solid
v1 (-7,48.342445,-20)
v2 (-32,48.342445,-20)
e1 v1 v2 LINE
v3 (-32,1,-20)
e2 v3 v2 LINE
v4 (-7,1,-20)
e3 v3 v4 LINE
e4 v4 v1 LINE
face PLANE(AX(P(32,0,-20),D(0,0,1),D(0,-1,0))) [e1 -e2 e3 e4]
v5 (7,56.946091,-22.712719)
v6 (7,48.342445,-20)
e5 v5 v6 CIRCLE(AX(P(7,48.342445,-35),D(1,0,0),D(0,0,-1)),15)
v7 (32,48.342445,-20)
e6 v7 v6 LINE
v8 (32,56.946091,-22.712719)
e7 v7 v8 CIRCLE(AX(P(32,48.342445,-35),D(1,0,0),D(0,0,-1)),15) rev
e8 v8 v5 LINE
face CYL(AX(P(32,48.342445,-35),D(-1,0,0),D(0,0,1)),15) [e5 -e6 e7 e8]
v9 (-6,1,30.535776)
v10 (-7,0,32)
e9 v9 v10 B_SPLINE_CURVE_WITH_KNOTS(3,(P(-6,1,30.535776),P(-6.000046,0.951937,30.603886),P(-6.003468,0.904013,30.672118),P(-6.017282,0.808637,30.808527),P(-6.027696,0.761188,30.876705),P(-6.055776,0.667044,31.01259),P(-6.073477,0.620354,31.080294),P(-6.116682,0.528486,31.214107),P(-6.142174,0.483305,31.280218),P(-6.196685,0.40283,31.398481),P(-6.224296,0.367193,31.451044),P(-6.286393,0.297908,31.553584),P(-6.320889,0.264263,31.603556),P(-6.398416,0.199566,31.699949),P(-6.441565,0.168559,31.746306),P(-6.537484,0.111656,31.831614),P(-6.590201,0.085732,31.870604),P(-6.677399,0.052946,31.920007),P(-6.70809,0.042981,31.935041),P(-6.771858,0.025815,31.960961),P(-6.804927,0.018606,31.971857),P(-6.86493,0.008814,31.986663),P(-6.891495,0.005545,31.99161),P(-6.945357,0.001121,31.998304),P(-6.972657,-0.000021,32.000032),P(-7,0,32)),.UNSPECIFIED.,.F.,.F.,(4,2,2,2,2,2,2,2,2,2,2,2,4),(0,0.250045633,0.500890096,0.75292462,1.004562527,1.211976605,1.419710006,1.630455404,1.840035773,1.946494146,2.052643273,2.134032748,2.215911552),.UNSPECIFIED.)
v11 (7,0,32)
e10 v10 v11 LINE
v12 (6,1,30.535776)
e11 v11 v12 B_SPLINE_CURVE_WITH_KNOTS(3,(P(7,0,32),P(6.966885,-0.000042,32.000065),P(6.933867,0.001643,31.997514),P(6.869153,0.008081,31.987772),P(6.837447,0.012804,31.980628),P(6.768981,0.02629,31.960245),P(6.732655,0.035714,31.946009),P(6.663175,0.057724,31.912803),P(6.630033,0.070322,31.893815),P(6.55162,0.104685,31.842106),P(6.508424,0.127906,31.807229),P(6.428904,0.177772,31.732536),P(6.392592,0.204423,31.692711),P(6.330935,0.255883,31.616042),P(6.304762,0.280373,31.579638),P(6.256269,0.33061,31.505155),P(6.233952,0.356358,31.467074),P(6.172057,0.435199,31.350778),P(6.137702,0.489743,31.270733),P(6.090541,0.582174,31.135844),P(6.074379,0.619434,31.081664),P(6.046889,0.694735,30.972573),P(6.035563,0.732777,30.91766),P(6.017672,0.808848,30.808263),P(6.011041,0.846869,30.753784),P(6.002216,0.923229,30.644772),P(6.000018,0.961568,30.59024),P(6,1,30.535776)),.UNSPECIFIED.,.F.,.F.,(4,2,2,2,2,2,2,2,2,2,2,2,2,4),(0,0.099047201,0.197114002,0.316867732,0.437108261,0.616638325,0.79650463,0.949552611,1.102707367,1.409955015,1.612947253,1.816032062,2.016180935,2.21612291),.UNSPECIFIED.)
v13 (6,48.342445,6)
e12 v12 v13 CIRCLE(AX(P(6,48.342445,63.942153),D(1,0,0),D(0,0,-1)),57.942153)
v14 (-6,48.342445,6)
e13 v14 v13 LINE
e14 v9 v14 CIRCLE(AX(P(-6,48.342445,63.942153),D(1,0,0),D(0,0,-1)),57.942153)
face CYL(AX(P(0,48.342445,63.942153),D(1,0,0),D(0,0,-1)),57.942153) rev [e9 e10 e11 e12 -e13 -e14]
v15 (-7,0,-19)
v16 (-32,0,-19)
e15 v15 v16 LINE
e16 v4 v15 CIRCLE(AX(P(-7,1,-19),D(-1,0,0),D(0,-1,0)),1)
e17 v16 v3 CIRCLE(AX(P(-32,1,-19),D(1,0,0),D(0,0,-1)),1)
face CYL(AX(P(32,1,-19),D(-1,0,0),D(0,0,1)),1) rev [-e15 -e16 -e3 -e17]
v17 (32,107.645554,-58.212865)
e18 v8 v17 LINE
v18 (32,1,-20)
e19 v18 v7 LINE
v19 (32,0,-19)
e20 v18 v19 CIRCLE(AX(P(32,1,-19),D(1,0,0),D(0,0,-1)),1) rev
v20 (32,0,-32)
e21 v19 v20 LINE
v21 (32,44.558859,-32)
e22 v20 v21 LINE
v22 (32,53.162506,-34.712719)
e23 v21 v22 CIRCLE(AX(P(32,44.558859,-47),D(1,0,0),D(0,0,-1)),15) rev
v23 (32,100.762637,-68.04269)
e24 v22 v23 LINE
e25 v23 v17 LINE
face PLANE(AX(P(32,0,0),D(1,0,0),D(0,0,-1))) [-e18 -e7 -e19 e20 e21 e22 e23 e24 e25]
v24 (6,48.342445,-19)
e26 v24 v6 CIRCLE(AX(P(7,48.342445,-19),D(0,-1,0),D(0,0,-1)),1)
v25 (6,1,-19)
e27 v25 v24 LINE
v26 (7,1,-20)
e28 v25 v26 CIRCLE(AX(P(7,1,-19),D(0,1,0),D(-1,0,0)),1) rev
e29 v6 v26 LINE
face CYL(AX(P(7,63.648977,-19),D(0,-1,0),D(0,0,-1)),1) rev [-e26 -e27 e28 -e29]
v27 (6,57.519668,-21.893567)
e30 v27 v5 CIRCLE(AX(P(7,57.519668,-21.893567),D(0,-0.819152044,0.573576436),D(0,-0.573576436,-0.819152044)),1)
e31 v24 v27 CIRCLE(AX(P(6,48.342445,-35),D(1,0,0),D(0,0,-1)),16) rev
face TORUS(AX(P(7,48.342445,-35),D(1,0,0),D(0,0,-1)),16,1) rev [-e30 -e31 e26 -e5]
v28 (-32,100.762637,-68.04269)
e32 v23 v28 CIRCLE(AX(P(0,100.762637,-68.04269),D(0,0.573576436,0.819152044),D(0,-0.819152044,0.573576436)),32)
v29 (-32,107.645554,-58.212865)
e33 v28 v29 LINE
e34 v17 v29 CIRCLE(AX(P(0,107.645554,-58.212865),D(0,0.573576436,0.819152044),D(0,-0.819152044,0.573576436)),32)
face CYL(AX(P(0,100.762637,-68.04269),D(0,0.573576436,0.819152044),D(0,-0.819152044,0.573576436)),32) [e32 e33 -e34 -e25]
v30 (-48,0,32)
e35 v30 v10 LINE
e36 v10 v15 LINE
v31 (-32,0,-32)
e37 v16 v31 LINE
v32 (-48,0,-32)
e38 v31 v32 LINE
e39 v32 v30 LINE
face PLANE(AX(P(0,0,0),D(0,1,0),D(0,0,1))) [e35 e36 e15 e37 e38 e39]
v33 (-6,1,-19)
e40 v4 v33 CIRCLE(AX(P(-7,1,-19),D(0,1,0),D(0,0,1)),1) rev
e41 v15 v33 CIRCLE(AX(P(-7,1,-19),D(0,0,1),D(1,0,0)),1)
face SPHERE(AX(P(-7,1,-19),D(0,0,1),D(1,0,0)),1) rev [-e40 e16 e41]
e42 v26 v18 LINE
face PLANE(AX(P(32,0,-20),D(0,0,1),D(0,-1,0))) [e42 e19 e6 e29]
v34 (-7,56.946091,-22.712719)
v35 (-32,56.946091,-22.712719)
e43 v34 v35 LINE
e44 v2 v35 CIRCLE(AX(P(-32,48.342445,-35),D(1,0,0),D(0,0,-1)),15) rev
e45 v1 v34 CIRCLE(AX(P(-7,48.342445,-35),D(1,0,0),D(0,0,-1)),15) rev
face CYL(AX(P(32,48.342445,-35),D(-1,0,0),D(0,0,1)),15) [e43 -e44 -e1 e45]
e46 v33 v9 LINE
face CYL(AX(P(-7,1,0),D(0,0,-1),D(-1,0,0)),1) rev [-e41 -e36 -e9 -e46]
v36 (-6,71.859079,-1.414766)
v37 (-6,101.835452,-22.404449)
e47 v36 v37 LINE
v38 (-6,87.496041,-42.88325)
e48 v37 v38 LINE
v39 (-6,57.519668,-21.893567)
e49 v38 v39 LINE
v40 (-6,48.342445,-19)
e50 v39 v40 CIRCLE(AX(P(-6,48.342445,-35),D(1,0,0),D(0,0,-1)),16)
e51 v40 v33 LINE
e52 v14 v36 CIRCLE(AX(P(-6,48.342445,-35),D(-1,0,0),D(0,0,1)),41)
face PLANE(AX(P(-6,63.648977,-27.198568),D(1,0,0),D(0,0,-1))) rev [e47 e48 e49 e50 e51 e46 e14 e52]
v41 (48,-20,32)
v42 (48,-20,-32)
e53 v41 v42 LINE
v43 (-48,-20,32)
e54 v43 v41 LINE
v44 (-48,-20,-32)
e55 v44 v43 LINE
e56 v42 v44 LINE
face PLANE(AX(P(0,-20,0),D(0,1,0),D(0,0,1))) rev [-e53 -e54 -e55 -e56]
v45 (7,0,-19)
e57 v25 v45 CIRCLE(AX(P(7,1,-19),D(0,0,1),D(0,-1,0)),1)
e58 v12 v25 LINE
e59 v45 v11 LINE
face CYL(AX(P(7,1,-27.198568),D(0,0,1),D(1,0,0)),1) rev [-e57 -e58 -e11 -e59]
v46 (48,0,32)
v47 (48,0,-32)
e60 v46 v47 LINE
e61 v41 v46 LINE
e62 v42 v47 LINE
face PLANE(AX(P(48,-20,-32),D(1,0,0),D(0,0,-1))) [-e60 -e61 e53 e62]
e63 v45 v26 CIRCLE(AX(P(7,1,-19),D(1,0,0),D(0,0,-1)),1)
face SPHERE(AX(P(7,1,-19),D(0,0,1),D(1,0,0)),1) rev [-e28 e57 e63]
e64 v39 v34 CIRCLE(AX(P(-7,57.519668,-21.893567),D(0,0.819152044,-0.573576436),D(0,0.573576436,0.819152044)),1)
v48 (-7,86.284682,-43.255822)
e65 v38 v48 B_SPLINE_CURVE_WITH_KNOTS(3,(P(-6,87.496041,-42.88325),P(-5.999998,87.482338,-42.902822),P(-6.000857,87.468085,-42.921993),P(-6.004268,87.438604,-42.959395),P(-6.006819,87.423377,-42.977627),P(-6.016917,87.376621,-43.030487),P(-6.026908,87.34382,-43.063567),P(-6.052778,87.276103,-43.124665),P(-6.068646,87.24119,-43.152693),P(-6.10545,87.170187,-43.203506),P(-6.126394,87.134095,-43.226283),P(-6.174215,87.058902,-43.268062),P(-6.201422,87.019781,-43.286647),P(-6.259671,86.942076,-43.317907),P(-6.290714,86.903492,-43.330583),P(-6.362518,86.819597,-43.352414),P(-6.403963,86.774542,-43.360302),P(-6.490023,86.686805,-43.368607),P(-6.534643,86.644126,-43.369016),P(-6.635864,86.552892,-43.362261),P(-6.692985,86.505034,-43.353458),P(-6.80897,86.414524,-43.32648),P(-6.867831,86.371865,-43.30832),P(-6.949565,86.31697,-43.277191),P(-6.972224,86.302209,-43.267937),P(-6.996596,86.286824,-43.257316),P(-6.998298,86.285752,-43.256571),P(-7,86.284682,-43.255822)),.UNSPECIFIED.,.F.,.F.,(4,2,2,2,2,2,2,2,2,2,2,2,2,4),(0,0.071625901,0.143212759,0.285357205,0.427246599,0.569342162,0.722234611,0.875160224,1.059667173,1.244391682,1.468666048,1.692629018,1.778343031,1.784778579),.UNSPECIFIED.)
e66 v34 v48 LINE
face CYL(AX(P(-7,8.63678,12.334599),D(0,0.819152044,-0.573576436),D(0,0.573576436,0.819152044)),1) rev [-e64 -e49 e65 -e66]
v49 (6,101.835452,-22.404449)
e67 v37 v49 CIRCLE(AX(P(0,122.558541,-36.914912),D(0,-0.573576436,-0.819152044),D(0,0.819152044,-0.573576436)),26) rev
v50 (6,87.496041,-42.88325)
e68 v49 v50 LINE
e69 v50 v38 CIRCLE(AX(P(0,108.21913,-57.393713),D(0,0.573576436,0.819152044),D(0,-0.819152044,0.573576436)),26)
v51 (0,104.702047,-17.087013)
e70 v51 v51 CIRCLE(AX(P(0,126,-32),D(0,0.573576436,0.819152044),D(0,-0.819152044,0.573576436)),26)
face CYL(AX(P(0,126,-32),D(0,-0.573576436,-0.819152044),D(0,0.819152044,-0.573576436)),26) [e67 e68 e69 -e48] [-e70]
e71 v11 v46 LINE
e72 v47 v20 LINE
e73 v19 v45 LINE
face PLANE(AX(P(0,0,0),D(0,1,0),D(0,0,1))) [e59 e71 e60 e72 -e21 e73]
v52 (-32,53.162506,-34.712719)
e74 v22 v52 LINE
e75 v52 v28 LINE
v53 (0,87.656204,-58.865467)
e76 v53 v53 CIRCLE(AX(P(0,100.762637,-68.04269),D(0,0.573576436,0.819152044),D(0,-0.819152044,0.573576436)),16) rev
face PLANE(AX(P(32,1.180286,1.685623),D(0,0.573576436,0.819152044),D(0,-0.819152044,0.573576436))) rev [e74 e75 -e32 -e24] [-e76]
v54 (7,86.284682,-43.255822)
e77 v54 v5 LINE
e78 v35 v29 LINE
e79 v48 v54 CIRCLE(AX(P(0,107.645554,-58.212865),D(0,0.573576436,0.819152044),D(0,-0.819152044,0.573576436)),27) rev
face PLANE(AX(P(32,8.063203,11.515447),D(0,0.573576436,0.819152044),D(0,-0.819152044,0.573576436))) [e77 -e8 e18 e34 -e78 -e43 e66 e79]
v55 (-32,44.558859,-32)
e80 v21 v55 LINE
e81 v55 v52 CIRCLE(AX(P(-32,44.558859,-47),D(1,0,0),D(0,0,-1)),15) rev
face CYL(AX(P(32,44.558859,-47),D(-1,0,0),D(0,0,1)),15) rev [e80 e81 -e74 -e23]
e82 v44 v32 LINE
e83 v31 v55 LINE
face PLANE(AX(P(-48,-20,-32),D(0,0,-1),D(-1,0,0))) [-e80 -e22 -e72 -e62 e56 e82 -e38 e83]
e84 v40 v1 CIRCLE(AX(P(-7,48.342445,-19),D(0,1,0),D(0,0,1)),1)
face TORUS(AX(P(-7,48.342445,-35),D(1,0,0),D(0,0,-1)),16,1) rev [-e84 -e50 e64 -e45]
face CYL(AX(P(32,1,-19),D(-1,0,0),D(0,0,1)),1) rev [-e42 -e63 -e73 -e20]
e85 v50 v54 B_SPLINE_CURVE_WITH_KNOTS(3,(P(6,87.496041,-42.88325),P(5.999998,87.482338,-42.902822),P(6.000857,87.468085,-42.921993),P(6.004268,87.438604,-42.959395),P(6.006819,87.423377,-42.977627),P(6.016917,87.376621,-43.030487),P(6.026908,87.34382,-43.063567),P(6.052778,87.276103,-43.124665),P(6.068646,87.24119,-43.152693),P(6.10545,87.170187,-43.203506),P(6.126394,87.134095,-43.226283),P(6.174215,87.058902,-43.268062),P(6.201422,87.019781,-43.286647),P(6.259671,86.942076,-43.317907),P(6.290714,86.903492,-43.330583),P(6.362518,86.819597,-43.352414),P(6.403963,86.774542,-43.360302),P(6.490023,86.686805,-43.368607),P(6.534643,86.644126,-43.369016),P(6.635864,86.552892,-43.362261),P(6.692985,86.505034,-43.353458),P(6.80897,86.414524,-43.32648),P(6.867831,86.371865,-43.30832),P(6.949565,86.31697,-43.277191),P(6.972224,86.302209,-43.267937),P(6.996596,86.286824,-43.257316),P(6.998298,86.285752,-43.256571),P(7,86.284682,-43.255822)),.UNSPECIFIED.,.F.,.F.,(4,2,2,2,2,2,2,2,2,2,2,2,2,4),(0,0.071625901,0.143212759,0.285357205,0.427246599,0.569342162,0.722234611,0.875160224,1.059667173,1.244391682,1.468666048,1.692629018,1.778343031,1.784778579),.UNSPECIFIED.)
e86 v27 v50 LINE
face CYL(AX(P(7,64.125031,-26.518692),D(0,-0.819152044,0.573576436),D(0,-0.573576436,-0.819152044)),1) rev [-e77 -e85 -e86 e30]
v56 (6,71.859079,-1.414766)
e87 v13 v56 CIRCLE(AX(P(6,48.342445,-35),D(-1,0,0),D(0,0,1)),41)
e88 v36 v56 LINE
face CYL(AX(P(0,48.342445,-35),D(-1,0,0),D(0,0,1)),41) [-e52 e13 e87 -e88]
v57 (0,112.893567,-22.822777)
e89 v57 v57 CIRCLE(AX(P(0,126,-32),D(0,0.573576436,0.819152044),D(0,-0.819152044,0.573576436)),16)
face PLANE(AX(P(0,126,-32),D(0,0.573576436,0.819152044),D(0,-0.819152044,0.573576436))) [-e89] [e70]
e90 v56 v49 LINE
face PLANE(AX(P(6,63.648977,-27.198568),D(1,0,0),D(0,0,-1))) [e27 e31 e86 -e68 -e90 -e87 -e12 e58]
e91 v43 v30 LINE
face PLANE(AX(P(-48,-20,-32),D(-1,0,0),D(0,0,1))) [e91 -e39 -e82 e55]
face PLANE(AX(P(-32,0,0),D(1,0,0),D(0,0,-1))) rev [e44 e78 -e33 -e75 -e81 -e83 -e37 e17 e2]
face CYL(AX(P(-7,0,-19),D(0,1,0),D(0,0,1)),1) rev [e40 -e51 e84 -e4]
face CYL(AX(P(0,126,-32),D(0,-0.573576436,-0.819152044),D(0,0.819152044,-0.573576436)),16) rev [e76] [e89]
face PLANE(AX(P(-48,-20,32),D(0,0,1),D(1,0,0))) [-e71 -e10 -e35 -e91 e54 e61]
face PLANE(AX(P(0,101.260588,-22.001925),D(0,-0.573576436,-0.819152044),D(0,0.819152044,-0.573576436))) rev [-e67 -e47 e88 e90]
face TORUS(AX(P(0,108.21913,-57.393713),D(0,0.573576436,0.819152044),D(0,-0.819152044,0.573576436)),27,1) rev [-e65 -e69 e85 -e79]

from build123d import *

# Parameters (mm, degrees)
SKETCH1_W               = 96
SKETCH1_H               = 64
BOSS_EXTRUDE1_DEPTH     = 20
BOSS_EXTRUDE2_DEPTH     = 32
BOSS_EXTRUDE3_DEPTH     = 12
SKETCH8_R               = 26
SKETCH8_R_2             = 16
BOSS_EXTRUDE4_DEPTH     = 32
CUT_EXTRUDE1_DEPTH      = 177.853582377
CUT_EXTRUDE1_DEPTH_BACK = 177.853582377
SKETCH9_R               = 16
RIB9_START              = -6
RIB9_DEPTH              = 12
FILLET1_R               = 1


with BuildPart() as part:
    # Sketch1 → Boss-Extrude1 (new body)
    with BuildSketch(Plane(origin=(0, 0, 0), x_dir=(1, 0, 0), z_dir=(0, 1, 0))):
        Rectangle(SKETCH1_W, SKETCH1_H)
    extrude(amount=-BOSS_EXTRUDE1_DEPTH)

    # Sketch4 → Boss-Extrude2 (add, symmetric)
    with BuildSketch(Plane(origin=(0, 0, 0), x_dir=(0, 0, -1), z_dir=(1, 0, 0))):
        with BuildLine():
            Line((20, -20), (32, -20))
            Line((32, -20), (32, 44.558859159))
            ThreePointArc((32, 44.558859159), (32.694245739, 49.069446152), (34.712719336, 53.162505705))
            Line((34.712719336, 53.162505705), (68.042689949, 100.762636801))
            Line((68.042689949, 100.762636801), (58.212865417, 107.645554037))
            Line((58.212865417, 107.645554037), (22.712719336, 56.946091171))
            ThreePointArc((22.712719336, 56.946091171), (20.694245739, 52.853031619), (20, 48.342444626))
            Line((20, 48.342444626), (20, -20))
        make_face()
    extrude(amount=BOSS_EXTRUDE2_DEPTH, both=True)

    # Sketch6 → Boss-Extrude3 (add)
    with BuildSketch(Plane(origin=(0, 8.063203075, 11.515447399), x_dir=(1, 0, 0), z_dir=(0, 0.573576436351053, 0.819152044288987))):
        with BuildLine():
            Line((-32, 121.567603544), (32, 121.567603544))
            ThreePointArc((32, 121.567603544), (0, 153.567603544), (-32, 121.567603544))
        make_face()
    extrude(amount=-BOSS_EXTRUDE3_DEPTH)

    # Sketch8 → Boss-Extrude4 (add)
    with BuildSketch(Plane(origin=(0, 8.063203075, 11.515447399), x_dir=(1, 0, 0), z_dir=(0, 0.573576436351053, 0.819152044288987))):
        with Locations(Location((0, 121.567603544, 0), (0, 0, 270))):
            Circle(SKETCH8_R)
        with Locations(Location((0, 121.567603544, 0), (0, 0, 270))):
            Circle(SKETCH8_R_2, mode=Mode.SUBTRACT)
    extrude(amount=BOSS_EXTRUDE4_DEPTH)

    # Sketch9 → Cut-Extrude1 (cut, two sides: drawn at the far end of the back side and taken through both)
    with BuildSketch(Plane(origin=(0, 8.063203075, 11.515447399), x_dir=(1, 0, 0), z_dir=(0, 0.573576436351053, 0.819152044288987)).offset(-CUT_EXTRUDE1_DEPTH_BACK)):
        with Locations(Location((0, 121.567603544, 0), (0, 0, 270))):
            Circle(SKETCH9_R)
    extrude(amount=CUT_EXTRUDE1_DEPTH + CUT_EXTRUDE1_DEPTH_BACK, mode=Mode.SUBTRACT)

    # Rib9: read off the stored shape, not the designer's step
    # Rib9 outline → Rib9 (add)
    with BuildSketch(Plane(origin=(0, 0, 0), x_dir=(0, 0, -1), z_dir=(1, 0, 0)).offset(RIB9_START)):
        with BuildLine():
            Line((22.712719336, 56.946091171), (43.702401809, 86.922464357))
            Line((43.702401809, 86.922464357), (22.404448657, 101.835451702))
            Line((22.404448657, 101.835451702), (1.414766184, 71.859078516))
            ThreePointArc((1.414766184, 71.859078516), (-4.102394981, 60.671382406), (-6, 48.342444626))
            ThreePointArc((-6, 48.342444626), (-12.91230776, 20.897080936), (-32, 0))
            Line((-32, 0), (20, 0))
            Line((20, 0), (20, 48.342444626))
            ThreePointArc((20, 48.342444626), (20.694245739, 52.853031619), (22.712719336, 56.946091171))
        make_face()
    extrude(amount=RIB9_DEPTH)

    # Fillet1
    # the kernel refuses this fillet: 1 mm, written as the material it adds along each edge
    with BuildSketch(Plane(origin=(-7, 1, -19), x_dir=(1, 0, 0), z_dir=(0, -1, 0))) as fillet1_piece_1_section:
        Polygon((0, 0), (FILLET1_R * 1.02, 0), (FILLET1_R * 1.02, -FILLET1_R * 1.02), (0, -FILLET1_R * 1.02), align=None)
    fillet1_piece_1 = extrude(amount=FILLET1_R * 1.02, mode=Mode.PRIVATE)
    fillet1_piece_1 = fillet1_piece_1 - Plane(origin=(-7, 1, -19), x_dir=(-0.7071067811865475, 0, 0.7071067811865475), z_dir=(0, -1, 0)) * Sphere(FILLET1_R, mode=Mode.PRIVATE)
    add(fillet1_piece_1)
    with BuildSketch(Plane(origin=(7, 1, -19), x_dir=(0, 0, -1), z_dir=(-1, 0, 0))) as fillet1_piece_2_section:
        Polygon((0, 0), (FILLET1_R * 1.02, 0), (FILLET1_R * 1.02, FILLET1_R * 1.02), (0, FILLET1_R * 1.02), align=None)
    fillet1_piece_2 = extrude(amount=FILLET1_R * 1.02, mode=Mode.PRIVATE)
    fillet1_piece_2 = fillet1_piece_2 - Plane(origin=(7, 1, -19), x_dir=(0, 0.7071067811865475, 0.7071067811865476), z_dir=(-1, 0, 0)) * Sphere(FILLET1_R, mode=Mode.PRIVATE)
    add(fillet1_piece_2)
    with BuildSketch(Plane(origin=(-6, 0, 34.5), x_dir=(-1, 0, 0), z_dir=(0, 0, -1))) as fillet1_piece_3_section:
        with BuildLine():
            CenterArc((FILLET1_R, FILLET1_R), FILLET1_R, 180, 90)
            Line((0, FILLET1_R), (0, 0))
            Line((0, 0), (FILLET1_R, 0))
        make_face()
    fillet1_piece_3 = extrude(amount=53.5, mode=Mode.PRIVATE)
    fillet1_piece_3 = fillet1_piece_3 - Plane(origin=(-6, 48.342444627, 63.942152933), x_dir=(0, -1.6764948068756696e-11, -1.0), z_dir=(-1, 0, 0)) * Cylinder(57.942152933, 111, mode=Mode.PRIVATE)
    add(fillet1_piece_3)
    with BuildSketch(Plane(origin=(-6, 1, -20), x_dir=(0, 0, 1), z_dir=(0, 1, 0)), Plane(origin=(6, 1, -20), x_dir=(1, 0, 0), z_dir=(0, 1, 0))) as fillet1_piece_4:
        with BuildLine():
            CenterArc((FILLET1_R, -FILLET1_R), FILLET1_R, 90, 90)
            Line((0, -FILLET1_R), (0, 0))
            Line((0, 0), (FILLET1_R, 0))
        make_face()
    extrude(amount=47.342444626)
    with BuildSketch(Plane(origin=(-6, 48.342444626, -34.999999997), x_dir=(0, -1.1790272464341429e-11, 1.0), z_dir=(0, -1.0, -1.1790272464341429e-11))) as fillet1_piece_5:
        with BuildLine():
            CenterArc((14.999999997 + FILLET1_R, FILLET1_R), FILLET1_R, 180, 90)
            Line((14.999999997, FILLET1_R), (14.999999997, 0))
            Line((14.999999997, 0), (14.999999997 + FILLET1_R, 0))
        make_face()
    revolve(axis=Axis((-6, 48.342444626, -34.999999997), (-1, 0, 0)), revolution_arc=35.000000006)
    with BuildSketch(Plane(origin=(-6, 56.946091171, -22.712719336), x_dir=(0, 0.5735764363505949, 0.8191520442893078), z_dir=(0, 0.8191520442893078, -0.5735764363505949))) as fillet1_piece_6:
        with BuildLine():
            CenterArc((FILLET1_R, -FILLET1_R), FILLET1_R, 90, 90)
            Line((FILLET1_R * 4.36944609845e-10, -FILLET1_R), (0, 0))
            Line((0, 0), (FILLET1_R, 0))
        make_face()
    extrude(amount=39.09439465)
    with BuildSketch(Plane(origin=(-7, 0, -20), x_dir=(0, 0, 1), z_dir=(-1, 0, 0)), Plane(origin=(32, 0, -20), x_dir=(0, 0, 1), z_dir=(-1, 0, 0))) as fillet1_piece_7:
        with BuildLine():
            CenterArc((FILLET1_R, FILLET1_R), FILLET1_R, 180, 90)
            Line((0, FILLET1_R), (0, 0))
            Line((0, 0), (FILLET1_R, 0))
        make_face()
    extrude(amount=25)
    with BuildSketch(Plane(origin=(0, 107.645554037, -58.212865417), x_dir=(0.13576209912183695, -0.8115678972317177, 0.5682659594106623), z_dir=(-0.990741465995056, -0.11120980103261684, 0.07786994100584167))) as fillet1_piece_8:
        with BuildLine():
            CenterArc((26 + FILLET1_R, FILLET1_R), FILLET1_R, 180, 90)
            Line((26, FILLET1_R), (26, 0))
            Line((26, 0), (26 + FILLET1_R, 0))
        make_face()
    revolve(axis=Axis((0, 107.645554037, -58.212865417), (0, 0.573576436351053, 0.819152044288987)), revolution_arc=344.394618628)
    with BuildSketch(Plane(origin=(6, 0, 34.5), x_dir=(1, 0, 0), z_dir=(0, 0, -1))) as fillet1_piece_9_section:
        with BuildLine():
            CenterArc((FILLET1_R, -FILLET1_R), FILLET1_R, 90, 90)
            Line((0, -FILLET1_R), (0, 0))
            Line((0, 0), (FILLET1_R, 0))
        make_face()
    fillet1_piece_9 = extrude(amount=53.5, mode=Mode.PRIVATE)
    fillet1_piece_9 = fillet1_piece_9 - Plane(origin=(6, 48.342444627, 63.942152933), x_dir=(0, -1.6764948068756696e-11, -1.0), z_dir=(-1, 0, 0)) * Cylinder(57.942152933, 111, mode=Mode.PRIVATE)
    add(fillet1_piece_9)
    with BuildSketch(Plane(origin=(6, 48.342444626, -34.999999997), x_dir=(0, -1.1790272464341429e-11, 1.0), z_dir=(0, -1.0, -1.1790272464341429e-11))) as fillet1_piece_10:
        with BuildLine():
            CenterArc((14.999999997 + FILLET1_R, -FILLET1_R), FILLET1_R, 90, 90)
            Line((14.999999997, -FILLET1_R), (14.999999997, 0))
            Line((14.999999997, 0), (14.999999997 + FILLET1_R, 0))
        make_face()
    revolve(axis=Axis((6, 48.342444626, -34.999999997), (-1, 0, 0)), revolution_arc=35.000000006)
    with BuildSketch(Plane(origin=(6, 56.946091171, -22.712719336), x_dir=(0, 0.5735764363505949, 0.8191520442893078), z_dir=(0, 0.8191520442893078, -0.5735764363505949))) as fillet1_piece_11:
        with BuildLine():
            CenterArc((FILLET1_R, FILLET1_R), FILLET1_R, 180, 90)
            Line((FILLET1_R * 4.36944609845e-10, FILLET1_R), (0, 0))
            Line((0, 0), (FILLET1_R, 0))
        make_face()
    extrude(amount=39.09439465)


solid = part.part
